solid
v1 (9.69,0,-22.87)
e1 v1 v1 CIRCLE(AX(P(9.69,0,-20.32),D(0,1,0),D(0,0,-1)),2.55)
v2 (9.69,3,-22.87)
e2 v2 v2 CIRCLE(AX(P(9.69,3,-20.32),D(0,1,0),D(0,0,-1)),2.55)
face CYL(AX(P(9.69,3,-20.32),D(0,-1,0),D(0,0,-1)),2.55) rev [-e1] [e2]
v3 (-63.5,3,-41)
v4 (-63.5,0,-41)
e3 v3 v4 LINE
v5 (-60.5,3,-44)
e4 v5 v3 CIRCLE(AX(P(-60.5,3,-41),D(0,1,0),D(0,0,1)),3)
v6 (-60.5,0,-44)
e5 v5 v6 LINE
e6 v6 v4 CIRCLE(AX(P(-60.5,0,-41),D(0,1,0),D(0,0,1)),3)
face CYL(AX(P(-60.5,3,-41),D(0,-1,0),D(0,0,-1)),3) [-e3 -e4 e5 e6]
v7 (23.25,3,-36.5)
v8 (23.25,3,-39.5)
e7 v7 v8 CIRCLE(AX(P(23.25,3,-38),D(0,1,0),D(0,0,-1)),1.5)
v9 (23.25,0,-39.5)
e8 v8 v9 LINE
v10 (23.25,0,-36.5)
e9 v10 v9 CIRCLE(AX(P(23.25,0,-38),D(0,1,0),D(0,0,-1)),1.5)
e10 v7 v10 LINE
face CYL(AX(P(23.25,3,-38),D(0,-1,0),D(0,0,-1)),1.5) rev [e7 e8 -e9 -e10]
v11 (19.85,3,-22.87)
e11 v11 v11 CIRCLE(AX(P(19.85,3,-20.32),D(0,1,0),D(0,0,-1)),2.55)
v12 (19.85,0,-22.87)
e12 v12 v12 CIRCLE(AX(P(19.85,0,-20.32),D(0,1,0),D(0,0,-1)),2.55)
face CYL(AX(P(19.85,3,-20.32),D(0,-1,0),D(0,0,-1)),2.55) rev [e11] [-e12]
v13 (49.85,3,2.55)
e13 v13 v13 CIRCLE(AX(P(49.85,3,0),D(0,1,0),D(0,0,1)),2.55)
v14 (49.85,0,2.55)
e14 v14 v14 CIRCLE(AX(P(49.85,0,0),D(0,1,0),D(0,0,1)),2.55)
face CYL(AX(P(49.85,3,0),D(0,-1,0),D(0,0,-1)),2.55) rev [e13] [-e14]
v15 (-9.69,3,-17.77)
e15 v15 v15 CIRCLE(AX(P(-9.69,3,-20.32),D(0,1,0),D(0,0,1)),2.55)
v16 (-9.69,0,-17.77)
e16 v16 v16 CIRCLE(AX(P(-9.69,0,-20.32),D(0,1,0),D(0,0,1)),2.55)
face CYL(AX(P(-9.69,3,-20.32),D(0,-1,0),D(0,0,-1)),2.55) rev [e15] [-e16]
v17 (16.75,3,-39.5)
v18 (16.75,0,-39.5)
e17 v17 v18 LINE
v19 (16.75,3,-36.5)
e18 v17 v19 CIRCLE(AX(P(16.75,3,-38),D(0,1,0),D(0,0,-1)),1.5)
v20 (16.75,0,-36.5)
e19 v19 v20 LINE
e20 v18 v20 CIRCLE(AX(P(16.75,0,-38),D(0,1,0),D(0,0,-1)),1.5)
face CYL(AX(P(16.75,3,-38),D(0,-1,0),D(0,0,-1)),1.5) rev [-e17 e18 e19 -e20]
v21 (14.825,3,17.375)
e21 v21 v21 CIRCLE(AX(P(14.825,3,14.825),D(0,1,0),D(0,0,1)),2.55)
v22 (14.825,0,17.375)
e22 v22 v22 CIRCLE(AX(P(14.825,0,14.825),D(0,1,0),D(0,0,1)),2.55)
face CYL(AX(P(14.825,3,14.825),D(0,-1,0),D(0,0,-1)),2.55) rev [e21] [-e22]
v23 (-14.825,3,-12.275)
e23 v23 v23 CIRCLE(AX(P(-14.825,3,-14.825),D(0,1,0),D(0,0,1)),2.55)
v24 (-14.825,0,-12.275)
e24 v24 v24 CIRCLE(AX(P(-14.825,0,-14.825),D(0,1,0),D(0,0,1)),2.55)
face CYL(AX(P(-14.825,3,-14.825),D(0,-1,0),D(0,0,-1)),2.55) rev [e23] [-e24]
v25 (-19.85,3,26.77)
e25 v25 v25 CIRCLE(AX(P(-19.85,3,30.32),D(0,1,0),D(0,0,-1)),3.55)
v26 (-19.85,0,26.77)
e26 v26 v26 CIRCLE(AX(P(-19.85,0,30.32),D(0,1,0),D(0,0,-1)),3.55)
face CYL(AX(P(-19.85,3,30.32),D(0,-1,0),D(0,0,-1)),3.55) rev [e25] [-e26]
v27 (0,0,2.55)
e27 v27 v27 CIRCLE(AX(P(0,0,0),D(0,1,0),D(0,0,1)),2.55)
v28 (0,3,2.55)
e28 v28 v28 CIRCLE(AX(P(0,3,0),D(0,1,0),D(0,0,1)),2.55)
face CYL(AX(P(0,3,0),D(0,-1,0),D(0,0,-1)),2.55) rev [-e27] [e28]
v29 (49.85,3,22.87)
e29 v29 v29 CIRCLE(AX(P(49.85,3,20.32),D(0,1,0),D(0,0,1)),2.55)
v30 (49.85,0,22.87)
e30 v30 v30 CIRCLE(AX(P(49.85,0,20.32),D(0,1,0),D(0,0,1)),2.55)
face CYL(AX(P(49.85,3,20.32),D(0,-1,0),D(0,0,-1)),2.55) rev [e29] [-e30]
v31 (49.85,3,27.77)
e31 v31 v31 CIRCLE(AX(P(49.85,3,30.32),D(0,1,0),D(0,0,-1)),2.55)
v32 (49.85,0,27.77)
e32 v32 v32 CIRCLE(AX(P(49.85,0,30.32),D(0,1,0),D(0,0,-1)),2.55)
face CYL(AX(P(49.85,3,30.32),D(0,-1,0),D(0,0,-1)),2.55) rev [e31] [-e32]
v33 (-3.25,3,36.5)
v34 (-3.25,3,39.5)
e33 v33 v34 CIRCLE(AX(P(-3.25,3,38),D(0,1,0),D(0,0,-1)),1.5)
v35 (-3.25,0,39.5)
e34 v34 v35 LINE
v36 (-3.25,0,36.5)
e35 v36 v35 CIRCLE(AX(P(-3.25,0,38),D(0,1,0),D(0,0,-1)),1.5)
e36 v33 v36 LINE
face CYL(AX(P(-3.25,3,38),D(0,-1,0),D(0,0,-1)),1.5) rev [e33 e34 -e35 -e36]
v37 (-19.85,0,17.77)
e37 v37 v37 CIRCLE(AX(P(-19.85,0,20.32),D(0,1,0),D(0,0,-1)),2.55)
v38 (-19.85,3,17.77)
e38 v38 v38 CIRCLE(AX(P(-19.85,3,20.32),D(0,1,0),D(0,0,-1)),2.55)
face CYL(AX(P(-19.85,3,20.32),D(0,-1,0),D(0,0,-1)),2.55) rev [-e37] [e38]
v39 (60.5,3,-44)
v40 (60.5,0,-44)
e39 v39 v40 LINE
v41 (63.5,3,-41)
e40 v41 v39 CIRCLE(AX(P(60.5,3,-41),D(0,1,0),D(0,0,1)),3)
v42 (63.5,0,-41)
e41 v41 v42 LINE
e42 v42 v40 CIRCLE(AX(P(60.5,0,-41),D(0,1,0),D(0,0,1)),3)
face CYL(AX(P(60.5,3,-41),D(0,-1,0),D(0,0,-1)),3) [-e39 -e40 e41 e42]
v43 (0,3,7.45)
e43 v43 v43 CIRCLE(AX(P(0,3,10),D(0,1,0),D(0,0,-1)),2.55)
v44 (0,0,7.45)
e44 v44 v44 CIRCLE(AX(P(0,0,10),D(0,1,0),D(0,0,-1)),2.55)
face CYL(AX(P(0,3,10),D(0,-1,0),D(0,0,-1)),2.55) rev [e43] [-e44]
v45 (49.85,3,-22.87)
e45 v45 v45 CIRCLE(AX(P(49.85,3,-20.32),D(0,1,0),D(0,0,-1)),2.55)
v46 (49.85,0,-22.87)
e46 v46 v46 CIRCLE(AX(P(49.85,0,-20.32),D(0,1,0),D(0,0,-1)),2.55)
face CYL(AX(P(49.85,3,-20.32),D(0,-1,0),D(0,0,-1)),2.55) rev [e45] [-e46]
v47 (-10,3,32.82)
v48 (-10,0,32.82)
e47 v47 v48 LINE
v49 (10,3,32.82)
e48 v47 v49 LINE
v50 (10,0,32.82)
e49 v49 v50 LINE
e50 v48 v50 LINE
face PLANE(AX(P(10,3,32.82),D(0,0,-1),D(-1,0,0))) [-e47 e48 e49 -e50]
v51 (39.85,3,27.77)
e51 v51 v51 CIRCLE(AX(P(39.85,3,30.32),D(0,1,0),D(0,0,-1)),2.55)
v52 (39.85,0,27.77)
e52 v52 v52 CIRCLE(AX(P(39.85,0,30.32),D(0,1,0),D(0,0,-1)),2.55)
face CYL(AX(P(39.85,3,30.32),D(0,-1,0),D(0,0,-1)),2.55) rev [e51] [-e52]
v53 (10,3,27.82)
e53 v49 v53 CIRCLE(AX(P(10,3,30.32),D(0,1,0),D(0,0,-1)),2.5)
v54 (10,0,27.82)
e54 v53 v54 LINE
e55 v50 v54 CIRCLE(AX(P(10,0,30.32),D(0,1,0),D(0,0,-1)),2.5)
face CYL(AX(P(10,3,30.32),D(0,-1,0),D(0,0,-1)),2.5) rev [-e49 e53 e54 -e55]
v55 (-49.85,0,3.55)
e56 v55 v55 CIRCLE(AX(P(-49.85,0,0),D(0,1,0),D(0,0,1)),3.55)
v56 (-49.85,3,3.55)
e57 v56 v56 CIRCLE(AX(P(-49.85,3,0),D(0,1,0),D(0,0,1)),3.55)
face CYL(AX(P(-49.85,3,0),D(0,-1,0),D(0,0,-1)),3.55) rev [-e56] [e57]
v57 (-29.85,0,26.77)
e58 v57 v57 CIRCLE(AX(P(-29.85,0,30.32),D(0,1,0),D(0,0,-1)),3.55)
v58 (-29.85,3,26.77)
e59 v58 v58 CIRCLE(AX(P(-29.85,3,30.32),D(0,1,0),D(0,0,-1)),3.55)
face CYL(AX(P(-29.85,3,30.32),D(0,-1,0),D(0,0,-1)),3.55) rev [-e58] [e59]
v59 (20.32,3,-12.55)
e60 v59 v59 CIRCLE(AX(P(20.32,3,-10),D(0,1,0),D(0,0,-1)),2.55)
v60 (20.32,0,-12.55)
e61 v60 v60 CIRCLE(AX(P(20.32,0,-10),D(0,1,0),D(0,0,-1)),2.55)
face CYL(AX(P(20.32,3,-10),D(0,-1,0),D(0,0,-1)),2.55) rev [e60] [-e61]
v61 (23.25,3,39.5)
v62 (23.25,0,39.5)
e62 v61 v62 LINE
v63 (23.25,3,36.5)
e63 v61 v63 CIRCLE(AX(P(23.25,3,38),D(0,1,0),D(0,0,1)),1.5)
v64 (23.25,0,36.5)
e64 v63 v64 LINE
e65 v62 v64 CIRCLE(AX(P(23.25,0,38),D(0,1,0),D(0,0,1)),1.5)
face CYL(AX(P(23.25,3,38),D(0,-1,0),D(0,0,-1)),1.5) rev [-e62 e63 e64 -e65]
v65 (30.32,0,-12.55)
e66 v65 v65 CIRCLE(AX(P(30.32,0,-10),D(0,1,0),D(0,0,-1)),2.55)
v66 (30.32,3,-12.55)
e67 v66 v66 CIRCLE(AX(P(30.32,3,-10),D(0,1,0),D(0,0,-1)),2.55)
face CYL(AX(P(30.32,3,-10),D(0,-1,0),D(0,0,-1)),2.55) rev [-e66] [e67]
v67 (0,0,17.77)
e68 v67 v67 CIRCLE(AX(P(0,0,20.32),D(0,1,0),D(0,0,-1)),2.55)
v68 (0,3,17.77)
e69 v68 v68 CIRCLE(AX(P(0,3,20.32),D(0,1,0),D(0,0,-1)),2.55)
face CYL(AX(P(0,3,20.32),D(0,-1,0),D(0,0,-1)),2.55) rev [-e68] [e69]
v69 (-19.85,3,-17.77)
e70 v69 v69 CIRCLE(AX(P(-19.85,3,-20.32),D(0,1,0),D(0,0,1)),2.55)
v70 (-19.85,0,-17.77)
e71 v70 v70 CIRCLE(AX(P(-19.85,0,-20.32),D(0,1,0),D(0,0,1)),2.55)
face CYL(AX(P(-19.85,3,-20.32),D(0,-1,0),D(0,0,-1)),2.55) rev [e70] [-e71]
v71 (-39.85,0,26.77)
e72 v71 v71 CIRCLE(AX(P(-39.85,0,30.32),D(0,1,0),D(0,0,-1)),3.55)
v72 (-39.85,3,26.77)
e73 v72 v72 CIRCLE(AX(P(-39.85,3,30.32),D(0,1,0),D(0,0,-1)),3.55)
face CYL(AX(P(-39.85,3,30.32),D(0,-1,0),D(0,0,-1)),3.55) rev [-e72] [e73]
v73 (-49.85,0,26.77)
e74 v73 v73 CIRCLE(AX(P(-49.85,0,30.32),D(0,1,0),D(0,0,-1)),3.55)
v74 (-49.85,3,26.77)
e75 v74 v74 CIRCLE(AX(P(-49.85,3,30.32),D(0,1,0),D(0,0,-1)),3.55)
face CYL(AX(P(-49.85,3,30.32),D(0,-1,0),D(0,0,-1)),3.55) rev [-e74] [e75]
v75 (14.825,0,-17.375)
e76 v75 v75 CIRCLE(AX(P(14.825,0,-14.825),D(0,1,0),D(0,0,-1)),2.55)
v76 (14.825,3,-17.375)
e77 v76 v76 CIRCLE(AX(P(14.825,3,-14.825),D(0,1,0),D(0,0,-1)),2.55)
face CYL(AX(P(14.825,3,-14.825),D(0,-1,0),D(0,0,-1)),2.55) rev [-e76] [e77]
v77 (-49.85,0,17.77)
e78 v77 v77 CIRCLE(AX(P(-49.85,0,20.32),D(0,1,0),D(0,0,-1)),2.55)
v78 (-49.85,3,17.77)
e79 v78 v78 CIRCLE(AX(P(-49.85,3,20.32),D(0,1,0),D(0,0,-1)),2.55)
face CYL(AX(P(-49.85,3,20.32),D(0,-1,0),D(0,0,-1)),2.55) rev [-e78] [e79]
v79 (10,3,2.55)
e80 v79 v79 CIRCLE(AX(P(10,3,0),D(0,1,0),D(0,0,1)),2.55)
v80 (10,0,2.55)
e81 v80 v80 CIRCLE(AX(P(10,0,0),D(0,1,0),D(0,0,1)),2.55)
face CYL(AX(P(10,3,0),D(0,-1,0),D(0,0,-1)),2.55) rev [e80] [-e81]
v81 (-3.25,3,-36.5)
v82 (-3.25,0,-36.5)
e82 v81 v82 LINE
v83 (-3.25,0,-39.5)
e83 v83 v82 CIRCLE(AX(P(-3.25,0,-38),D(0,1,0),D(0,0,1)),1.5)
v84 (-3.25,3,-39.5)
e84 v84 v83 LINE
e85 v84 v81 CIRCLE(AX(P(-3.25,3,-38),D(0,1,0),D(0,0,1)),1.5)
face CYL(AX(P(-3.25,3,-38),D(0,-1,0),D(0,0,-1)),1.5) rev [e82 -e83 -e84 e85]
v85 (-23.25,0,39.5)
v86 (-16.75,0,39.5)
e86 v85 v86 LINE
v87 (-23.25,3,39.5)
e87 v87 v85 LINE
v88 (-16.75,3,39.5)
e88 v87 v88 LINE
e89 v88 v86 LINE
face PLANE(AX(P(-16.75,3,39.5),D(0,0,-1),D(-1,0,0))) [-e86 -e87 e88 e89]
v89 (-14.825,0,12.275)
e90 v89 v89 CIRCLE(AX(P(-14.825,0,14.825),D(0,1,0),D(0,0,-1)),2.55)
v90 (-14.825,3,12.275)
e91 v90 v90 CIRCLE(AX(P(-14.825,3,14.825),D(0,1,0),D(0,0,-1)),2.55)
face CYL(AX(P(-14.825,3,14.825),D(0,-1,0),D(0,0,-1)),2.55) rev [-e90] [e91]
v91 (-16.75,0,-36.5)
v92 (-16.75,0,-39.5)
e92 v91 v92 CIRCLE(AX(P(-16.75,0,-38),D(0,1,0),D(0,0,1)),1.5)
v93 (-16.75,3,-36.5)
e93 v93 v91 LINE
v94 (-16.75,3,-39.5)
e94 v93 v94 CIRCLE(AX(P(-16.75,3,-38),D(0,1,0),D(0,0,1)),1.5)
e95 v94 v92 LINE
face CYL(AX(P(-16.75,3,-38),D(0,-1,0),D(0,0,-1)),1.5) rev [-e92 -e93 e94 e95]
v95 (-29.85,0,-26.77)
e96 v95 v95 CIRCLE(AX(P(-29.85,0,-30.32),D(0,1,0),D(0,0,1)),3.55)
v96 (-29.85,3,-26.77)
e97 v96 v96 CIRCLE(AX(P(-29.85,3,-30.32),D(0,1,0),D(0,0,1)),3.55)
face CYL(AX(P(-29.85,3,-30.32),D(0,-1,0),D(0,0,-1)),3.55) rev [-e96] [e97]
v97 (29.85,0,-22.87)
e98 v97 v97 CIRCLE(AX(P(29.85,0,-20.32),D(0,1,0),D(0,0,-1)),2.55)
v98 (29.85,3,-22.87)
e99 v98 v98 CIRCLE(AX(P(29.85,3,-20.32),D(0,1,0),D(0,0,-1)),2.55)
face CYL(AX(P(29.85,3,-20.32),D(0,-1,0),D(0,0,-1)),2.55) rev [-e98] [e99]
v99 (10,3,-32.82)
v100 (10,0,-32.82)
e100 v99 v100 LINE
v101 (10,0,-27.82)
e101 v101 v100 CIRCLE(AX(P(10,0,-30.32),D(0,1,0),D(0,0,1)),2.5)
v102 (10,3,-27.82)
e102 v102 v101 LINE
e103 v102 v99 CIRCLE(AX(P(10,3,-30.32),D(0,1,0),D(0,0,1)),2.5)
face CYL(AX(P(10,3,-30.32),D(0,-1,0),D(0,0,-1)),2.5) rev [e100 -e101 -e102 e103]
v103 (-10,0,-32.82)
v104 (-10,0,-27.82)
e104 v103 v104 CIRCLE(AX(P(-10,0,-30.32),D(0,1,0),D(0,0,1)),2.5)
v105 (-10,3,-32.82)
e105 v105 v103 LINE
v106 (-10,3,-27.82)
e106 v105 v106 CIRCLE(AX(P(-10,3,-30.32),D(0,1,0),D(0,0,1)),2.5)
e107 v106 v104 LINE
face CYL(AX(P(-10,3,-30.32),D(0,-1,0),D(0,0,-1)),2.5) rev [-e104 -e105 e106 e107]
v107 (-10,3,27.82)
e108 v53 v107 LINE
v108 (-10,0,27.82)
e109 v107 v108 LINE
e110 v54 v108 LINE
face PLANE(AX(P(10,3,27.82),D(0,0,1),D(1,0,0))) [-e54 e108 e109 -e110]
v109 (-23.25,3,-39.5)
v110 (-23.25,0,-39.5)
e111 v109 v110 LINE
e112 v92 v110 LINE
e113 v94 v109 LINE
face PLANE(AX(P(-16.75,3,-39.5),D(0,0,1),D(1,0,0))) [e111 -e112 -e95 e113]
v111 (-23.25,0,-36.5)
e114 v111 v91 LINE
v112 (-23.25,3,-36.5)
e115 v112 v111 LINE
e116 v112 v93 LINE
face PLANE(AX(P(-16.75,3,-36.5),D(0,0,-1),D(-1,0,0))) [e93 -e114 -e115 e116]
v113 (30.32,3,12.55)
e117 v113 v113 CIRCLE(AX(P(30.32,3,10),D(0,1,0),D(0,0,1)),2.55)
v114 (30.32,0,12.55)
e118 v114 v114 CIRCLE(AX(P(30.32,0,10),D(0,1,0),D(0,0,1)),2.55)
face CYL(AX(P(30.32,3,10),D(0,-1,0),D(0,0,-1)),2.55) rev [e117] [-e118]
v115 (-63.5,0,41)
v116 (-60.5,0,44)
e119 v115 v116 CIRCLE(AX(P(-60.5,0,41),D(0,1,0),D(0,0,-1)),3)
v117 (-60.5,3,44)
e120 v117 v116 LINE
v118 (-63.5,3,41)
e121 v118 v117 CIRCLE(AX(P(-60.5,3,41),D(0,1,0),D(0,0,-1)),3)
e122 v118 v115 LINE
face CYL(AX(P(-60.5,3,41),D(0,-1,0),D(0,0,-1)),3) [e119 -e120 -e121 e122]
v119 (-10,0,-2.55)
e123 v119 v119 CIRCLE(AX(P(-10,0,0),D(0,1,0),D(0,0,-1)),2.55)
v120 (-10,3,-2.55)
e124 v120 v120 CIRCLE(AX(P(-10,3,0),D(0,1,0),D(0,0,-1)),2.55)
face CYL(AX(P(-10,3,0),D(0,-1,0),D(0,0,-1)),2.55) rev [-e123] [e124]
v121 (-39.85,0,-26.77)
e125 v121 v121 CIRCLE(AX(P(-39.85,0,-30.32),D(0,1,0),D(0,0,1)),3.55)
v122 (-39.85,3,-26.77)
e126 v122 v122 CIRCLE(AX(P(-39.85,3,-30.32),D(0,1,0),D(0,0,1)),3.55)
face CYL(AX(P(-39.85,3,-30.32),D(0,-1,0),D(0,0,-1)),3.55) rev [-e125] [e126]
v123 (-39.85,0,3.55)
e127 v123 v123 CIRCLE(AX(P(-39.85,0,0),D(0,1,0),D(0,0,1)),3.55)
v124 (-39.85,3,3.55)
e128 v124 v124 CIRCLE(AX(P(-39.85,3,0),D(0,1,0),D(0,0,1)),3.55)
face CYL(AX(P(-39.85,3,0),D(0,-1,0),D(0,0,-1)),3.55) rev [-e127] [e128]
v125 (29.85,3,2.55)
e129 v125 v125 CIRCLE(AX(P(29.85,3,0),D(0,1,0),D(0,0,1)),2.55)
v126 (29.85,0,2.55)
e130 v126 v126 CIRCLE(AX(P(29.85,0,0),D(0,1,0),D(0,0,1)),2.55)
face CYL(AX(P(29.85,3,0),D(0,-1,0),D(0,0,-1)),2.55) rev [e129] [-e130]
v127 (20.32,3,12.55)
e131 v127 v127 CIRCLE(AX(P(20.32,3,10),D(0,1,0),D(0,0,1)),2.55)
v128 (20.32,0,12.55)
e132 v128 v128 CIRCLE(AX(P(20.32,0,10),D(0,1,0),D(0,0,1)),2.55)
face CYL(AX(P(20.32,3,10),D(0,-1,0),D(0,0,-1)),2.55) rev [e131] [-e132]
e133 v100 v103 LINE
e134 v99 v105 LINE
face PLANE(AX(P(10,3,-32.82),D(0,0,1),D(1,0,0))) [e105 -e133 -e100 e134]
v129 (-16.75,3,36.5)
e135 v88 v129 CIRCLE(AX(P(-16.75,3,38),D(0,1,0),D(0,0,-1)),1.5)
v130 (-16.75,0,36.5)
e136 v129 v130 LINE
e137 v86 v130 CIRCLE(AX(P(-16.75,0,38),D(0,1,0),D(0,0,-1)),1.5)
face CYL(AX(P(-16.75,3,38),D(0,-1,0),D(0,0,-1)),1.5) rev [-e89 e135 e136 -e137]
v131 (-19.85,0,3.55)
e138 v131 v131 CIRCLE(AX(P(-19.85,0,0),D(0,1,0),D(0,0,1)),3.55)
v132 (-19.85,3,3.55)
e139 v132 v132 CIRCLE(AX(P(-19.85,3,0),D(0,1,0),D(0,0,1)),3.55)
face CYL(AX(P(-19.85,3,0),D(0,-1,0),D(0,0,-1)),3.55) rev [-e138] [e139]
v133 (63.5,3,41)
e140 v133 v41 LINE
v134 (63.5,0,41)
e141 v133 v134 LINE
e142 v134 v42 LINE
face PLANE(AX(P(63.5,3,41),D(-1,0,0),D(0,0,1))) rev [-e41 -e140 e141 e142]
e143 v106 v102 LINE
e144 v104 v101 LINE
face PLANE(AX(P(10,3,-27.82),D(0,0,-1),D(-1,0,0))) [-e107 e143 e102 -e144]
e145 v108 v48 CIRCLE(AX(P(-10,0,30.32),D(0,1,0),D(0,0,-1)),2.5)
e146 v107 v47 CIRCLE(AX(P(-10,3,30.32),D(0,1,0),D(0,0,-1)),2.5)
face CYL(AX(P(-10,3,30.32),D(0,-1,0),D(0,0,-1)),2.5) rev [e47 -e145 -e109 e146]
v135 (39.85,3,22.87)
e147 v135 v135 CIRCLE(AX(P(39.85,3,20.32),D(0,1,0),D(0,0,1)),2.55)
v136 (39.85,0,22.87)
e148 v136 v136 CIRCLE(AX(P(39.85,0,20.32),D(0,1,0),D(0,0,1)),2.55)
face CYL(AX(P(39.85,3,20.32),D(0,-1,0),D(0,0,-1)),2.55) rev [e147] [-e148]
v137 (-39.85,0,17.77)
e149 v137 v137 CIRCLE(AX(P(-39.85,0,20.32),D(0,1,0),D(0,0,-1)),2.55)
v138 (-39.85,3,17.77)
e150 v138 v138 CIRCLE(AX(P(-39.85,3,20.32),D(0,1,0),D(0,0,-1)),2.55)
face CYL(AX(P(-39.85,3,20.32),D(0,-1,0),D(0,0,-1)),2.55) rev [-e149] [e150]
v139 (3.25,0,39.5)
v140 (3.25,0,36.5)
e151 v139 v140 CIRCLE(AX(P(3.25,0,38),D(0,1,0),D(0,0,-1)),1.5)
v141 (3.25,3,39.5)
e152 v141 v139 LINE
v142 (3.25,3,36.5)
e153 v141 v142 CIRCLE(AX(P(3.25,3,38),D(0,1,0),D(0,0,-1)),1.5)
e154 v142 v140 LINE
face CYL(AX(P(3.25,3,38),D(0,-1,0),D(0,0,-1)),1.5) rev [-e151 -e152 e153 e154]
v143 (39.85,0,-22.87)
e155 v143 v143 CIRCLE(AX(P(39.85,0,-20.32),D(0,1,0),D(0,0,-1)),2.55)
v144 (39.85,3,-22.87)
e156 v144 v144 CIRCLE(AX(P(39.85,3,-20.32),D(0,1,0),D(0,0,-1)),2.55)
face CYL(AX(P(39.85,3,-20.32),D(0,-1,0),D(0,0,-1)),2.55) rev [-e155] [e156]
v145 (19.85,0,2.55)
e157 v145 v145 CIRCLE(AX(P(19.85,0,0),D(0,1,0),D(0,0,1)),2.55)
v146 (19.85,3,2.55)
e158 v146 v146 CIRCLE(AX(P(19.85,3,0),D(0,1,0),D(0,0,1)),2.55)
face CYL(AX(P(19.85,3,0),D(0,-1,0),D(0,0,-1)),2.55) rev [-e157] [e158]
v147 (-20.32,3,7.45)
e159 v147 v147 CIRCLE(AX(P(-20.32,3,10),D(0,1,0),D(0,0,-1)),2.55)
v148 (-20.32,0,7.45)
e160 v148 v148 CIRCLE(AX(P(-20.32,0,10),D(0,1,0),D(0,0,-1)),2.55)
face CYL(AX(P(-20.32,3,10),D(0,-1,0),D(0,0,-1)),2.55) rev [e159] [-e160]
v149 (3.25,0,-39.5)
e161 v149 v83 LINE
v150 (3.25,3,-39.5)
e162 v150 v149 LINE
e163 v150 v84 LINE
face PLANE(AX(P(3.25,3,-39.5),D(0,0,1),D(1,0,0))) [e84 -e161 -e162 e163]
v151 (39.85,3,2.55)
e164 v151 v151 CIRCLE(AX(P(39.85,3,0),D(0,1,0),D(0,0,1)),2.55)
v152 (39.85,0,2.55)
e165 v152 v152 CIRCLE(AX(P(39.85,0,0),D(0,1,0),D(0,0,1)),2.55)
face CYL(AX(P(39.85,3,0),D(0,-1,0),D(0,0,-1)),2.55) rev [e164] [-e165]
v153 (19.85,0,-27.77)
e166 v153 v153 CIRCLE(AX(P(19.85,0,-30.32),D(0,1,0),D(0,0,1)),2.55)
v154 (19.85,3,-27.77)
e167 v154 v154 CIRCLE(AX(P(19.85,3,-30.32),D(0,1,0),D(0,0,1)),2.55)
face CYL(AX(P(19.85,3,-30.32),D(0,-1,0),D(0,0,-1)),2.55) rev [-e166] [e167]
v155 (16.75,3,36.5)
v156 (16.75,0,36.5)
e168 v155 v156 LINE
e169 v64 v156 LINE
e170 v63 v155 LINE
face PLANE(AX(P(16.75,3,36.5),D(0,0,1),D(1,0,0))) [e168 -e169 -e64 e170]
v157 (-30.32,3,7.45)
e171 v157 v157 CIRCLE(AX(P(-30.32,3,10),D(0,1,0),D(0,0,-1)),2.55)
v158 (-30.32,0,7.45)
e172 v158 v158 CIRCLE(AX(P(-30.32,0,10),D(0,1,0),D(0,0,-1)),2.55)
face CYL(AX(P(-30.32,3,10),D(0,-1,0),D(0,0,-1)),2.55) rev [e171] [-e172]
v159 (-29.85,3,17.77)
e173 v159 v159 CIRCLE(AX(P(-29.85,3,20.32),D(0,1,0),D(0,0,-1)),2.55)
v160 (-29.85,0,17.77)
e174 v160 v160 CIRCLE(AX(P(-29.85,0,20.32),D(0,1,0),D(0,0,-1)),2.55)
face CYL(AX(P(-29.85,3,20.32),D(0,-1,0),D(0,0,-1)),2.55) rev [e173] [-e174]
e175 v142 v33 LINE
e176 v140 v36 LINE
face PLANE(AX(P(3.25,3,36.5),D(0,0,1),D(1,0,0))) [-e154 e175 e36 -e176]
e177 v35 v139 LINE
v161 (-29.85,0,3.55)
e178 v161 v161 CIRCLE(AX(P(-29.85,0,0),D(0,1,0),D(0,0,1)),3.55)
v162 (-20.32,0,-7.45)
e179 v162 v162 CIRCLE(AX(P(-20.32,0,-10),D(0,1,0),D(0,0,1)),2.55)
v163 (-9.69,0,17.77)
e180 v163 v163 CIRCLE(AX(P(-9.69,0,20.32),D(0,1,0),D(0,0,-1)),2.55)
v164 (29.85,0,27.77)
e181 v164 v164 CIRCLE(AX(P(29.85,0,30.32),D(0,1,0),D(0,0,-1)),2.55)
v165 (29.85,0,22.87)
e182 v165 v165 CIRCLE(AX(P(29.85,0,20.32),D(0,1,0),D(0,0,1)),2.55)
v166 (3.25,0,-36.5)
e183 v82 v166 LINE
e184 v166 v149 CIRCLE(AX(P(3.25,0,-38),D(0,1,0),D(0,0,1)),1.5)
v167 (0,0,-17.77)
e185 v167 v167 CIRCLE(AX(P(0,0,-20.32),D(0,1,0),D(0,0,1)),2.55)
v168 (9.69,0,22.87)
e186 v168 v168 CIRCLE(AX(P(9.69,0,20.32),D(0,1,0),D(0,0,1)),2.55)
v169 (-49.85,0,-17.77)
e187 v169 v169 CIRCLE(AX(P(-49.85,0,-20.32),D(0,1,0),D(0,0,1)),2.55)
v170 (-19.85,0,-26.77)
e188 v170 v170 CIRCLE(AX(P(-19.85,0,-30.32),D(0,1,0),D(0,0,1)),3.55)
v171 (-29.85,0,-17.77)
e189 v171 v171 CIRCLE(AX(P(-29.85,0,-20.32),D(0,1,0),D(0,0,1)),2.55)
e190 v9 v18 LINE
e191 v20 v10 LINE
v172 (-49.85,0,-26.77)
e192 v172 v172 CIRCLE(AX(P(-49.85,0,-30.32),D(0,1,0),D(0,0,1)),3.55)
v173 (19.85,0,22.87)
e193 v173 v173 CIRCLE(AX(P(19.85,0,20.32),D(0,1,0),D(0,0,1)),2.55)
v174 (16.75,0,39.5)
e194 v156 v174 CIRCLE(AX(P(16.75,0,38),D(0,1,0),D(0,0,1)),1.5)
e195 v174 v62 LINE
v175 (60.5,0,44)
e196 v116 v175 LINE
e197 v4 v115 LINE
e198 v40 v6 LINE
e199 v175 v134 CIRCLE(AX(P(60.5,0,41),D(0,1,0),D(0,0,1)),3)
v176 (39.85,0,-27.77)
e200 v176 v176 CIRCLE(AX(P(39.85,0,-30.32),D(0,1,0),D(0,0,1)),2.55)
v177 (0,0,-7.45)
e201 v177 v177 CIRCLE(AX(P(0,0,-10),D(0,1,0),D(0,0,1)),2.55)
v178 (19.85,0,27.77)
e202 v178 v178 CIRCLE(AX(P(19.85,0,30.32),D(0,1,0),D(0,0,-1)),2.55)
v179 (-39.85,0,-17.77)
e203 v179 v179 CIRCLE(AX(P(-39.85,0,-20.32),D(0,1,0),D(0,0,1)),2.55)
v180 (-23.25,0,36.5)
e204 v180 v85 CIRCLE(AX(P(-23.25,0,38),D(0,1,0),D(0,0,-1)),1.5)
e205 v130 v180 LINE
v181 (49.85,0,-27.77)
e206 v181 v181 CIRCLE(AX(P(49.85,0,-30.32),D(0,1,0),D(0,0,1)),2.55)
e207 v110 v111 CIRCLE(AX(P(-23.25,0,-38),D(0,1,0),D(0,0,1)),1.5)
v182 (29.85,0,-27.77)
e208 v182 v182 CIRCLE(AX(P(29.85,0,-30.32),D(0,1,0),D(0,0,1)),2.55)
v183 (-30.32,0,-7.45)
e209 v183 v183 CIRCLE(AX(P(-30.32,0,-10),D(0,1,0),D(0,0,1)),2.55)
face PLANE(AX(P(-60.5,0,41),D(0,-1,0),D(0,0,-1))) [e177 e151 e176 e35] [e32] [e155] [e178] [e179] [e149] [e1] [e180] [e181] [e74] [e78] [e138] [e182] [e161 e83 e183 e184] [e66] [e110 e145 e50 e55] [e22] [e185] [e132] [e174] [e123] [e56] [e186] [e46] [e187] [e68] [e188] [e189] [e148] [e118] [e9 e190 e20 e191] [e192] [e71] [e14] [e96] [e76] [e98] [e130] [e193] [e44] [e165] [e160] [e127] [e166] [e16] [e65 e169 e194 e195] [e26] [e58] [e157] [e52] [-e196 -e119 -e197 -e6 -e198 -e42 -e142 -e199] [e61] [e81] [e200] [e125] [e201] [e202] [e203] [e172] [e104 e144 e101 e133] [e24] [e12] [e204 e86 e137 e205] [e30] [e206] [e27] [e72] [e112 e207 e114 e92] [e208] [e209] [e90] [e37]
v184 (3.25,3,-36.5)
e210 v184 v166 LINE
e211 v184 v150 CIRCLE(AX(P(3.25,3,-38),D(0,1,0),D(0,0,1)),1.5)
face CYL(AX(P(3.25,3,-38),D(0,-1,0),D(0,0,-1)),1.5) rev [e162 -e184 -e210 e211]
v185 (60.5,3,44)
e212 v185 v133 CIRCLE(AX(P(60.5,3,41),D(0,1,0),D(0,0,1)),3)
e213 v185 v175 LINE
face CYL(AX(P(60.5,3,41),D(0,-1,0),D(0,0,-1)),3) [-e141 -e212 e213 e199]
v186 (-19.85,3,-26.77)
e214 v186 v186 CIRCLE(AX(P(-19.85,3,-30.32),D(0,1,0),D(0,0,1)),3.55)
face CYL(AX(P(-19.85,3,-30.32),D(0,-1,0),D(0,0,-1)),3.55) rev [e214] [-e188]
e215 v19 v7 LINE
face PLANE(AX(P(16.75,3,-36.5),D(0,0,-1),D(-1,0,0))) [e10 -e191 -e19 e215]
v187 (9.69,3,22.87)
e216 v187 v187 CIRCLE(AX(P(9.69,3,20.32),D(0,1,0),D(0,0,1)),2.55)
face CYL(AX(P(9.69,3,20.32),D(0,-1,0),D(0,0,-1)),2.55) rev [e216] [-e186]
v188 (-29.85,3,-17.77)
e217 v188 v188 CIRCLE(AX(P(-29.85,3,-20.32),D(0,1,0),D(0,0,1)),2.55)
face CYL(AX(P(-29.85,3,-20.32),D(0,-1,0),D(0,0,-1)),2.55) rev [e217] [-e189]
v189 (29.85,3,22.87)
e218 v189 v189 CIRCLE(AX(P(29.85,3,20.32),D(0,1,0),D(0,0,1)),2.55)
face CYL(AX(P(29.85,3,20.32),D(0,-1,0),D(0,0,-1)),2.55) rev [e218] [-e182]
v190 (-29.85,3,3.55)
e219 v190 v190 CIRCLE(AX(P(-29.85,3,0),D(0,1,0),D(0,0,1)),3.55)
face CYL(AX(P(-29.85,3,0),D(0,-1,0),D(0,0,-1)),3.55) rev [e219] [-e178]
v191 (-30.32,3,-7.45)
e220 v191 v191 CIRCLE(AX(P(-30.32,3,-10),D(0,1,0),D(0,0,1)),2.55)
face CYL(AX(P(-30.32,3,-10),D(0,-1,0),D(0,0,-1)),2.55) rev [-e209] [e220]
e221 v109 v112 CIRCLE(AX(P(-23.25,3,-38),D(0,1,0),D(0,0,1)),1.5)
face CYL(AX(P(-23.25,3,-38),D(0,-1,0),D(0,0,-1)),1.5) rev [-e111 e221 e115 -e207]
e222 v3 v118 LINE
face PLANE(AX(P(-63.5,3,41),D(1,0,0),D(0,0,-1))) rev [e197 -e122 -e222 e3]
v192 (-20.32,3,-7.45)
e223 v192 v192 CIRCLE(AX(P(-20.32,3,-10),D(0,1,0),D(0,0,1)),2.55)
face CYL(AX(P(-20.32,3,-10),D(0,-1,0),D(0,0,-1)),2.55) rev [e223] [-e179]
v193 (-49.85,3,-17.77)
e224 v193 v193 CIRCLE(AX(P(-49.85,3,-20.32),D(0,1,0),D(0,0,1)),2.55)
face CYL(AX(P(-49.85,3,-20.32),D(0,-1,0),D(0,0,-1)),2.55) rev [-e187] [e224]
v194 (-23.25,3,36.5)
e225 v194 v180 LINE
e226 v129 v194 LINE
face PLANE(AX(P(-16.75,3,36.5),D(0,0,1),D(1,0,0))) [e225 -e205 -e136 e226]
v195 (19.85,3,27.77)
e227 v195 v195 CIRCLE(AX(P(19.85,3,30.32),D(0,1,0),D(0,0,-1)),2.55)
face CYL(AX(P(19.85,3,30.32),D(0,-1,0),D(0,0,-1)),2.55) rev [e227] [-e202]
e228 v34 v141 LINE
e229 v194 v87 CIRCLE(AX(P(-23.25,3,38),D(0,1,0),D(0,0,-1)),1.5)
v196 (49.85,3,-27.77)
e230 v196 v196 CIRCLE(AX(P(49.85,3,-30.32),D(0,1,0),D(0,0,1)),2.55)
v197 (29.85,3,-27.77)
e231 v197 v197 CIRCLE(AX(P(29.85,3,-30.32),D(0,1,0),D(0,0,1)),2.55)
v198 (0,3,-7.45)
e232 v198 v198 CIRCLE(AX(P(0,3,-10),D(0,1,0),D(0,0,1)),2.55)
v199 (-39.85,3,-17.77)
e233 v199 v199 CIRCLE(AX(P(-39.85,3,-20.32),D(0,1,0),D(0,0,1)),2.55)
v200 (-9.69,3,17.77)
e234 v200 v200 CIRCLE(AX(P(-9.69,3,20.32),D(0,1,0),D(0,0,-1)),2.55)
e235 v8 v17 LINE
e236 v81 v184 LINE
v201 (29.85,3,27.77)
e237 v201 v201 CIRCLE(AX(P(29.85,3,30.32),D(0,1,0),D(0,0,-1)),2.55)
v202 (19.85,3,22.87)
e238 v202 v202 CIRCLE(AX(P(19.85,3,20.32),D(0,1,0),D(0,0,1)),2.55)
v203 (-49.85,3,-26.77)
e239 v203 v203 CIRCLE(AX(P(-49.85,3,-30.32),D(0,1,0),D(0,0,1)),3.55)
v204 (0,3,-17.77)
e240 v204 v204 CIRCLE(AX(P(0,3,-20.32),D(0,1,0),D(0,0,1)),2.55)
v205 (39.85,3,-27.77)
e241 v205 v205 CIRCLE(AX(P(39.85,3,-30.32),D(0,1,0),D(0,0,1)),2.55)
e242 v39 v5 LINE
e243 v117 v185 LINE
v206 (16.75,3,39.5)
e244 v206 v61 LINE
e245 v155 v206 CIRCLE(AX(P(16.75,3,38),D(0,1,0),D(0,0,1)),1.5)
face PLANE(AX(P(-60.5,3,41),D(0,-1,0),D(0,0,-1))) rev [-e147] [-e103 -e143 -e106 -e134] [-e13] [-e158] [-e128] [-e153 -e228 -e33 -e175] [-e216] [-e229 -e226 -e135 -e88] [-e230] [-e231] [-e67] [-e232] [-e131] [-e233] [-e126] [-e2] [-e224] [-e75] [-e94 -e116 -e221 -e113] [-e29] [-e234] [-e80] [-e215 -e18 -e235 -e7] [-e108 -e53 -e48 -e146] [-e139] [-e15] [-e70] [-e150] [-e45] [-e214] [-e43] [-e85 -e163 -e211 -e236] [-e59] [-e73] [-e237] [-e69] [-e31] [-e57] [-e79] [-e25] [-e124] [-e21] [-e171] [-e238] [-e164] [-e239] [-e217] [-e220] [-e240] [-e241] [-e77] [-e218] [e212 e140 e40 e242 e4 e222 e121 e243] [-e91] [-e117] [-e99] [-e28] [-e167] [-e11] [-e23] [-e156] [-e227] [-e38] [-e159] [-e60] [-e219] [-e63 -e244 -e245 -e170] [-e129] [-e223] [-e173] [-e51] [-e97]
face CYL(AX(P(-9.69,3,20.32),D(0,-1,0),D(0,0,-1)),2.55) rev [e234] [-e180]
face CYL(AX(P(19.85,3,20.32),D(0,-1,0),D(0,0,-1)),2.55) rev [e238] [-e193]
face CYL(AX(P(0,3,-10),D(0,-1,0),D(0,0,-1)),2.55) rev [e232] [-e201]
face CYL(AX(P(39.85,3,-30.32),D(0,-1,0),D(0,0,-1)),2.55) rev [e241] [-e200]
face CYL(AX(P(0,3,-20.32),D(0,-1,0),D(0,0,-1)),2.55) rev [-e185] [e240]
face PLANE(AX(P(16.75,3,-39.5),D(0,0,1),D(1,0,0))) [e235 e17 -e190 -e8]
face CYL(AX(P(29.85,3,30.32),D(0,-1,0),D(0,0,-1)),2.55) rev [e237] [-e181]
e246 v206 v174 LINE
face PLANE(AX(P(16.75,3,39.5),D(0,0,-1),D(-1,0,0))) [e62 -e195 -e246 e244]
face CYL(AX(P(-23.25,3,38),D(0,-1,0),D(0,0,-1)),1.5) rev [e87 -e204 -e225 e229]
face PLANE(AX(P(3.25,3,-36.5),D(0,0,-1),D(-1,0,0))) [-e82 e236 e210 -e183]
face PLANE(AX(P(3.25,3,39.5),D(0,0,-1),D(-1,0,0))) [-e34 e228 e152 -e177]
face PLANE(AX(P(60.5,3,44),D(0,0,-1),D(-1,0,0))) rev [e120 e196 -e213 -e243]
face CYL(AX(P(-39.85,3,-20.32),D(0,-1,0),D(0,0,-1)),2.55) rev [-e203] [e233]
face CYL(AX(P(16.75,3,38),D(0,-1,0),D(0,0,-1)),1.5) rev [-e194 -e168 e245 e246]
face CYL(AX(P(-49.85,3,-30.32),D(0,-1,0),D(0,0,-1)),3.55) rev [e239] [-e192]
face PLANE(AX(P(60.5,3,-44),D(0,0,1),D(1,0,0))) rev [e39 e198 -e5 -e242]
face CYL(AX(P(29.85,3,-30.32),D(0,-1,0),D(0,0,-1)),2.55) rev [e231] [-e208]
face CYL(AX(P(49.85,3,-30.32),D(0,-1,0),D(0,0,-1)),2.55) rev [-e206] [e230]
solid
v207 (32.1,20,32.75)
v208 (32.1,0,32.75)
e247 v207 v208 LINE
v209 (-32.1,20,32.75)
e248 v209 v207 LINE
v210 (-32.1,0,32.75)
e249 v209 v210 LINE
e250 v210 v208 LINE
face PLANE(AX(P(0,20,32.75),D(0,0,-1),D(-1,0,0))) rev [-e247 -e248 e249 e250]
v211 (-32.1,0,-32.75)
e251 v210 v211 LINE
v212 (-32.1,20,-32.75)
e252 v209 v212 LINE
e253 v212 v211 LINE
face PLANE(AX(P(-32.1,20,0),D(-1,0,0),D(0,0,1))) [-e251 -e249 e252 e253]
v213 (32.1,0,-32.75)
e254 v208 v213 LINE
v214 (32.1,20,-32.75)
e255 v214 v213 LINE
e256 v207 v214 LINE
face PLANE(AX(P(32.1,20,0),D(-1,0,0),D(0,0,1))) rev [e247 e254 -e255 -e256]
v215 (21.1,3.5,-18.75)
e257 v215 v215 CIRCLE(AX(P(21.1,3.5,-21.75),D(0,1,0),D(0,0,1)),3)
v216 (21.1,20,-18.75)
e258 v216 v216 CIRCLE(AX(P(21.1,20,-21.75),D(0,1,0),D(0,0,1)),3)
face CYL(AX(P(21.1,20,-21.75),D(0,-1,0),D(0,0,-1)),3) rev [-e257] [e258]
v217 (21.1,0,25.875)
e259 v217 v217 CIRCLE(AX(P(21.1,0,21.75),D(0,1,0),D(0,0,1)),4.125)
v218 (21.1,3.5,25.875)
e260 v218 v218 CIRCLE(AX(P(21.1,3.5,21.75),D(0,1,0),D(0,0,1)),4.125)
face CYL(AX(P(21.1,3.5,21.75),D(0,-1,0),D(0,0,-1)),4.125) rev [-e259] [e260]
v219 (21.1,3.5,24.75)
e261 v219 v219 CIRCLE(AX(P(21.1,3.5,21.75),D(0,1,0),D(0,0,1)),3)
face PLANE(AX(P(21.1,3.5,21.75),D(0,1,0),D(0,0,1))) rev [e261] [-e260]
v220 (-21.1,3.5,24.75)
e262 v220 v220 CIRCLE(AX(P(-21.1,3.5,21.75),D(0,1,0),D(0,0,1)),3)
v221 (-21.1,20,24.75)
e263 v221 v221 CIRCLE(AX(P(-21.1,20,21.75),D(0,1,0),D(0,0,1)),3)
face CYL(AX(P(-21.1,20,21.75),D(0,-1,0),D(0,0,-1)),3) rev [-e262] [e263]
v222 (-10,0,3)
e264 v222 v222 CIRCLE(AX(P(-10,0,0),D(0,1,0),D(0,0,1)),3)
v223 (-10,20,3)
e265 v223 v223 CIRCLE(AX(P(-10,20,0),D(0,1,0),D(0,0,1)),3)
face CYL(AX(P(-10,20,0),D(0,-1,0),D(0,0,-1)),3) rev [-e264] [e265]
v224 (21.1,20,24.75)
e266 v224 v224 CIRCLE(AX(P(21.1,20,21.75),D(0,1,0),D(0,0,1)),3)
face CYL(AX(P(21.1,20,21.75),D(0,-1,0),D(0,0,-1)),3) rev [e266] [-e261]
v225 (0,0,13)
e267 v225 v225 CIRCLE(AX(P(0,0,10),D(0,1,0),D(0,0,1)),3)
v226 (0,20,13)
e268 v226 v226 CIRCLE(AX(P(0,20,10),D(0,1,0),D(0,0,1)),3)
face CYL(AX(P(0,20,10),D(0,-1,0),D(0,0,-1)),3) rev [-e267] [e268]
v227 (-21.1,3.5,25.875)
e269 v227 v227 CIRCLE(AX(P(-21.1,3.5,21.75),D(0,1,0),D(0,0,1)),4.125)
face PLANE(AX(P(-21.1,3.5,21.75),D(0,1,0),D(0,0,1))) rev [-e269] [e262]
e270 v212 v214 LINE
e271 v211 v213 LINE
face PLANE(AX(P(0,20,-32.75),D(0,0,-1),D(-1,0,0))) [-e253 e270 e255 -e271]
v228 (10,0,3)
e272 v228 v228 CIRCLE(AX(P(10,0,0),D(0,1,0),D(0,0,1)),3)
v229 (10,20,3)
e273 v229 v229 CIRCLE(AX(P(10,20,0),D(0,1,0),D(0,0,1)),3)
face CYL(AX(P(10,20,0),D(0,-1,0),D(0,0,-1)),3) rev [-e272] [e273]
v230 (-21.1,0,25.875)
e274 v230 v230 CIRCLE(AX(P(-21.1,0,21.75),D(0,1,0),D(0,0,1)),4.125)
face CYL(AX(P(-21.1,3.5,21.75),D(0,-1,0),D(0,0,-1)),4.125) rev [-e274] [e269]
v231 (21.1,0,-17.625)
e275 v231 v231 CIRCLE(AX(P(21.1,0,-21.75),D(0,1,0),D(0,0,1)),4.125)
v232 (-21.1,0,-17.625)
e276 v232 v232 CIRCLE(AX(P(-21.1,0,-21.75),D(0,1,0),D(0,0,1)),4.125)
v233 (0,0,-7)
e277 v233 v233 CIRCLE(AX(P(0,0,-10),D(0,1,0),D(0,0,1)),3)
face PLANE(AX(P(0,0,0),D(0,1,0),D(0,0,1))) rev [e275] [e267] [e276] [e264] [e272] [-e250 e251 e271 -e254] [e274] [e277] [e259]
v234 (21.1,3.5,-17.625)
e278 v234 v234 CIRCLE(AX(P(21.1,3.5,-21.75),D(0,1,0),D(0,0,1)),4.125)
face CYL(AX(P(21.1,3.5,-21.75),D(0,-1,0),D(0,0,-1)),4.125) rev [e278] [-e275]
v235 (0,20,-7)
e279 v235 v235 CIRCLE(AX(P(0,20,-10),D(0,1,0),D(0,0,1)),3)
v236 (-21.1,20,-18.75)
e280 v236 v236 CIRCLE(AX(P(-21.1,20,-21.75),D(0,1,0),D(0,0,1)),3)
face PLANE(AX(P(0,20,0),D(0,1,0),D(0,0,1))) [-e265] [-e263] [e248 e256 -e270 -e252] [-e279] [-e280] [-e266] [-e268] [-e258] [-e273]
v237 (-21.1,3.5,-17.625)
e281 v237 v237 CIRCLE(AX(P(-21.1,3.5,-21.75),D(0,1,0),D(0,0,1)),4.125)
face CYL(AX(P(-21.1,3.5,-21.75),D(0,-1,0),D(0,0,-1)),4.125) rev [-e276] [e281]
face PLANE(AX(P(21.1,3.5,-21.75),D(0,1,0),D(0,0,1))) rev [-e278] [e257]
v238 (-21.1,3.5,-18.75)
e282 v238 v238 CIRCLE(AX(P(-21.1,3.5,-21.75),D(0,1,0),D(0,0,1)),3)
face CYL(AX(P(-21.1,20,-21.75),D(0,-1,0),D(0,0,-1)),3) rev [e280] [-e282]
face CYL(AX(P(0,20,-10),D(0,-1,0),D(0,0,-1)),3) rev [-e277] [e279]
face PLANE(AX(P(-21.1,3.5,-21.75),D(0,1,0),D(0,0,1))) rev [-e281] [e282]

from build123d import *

# Parameters (mm, degrees)
V_SLOT_GANTRY_PLATE_20_80MM_OUTLINE_R   = 3.55
V_SLOT_GANTRY_PLATE_20_80MM_OUTLINE_R_2 = 2.55
V_SLOT_GANTRY_PLATE_20_80MM_DEPTH       = 3
SKETCH1_W                               = 64.2
SKETCH1_H                               = 65.5
SKETCH1_R                               = 4.125
SKETCH1_R_2                             = 3
BOSS_EXTRUDE1_DEPTH                     = 20
SKETCH1_3_R                             = 4.125
CUT_EXTRUDE1_DEPTH                      = 3.5


# Read off the part's stored shape, not the designer's step: V-Slot Gantry Plate 20-80mm
with BuildPart() as part:
    # V-Slot Gantry Plate 20-80mm outline → V-Slot Gantry Plate 20-80mm (new body)
    with BuildSketch(Plane(origin=(0, 0, 0), x_dir=(1, 0, 0), z_dir=(0, 1, 0))):
        with BuildLine():
            ThreePointArc((-63.5, -41), (-62.621320344, -43.121320344), (-60.5, -44))
            Line((-60.5, -44), (60.5, -44))
            ThreePointArc((60.5, -44), (62.621320344, -43.121320344), (63.5, -41))
            Line((63.5, -41), (63.5, 41))
            ThreePointArc((63.5, 41), (62.621320344, 43.121320344), (60.5, 44))
            Line((60.5, 44), (-60.5, 44))
            ThreePointArc((-60.5, 44), (-62.621320344, 43.121320344), (-63.5, 41))
            Line((-63.5, 41), (-63.5, -41))
        make_face()
        with Locations((-49.85, -30.32)):
            Circle(V_SLOT_GANTRY_PLATE_20_80MM_OUTLINE_R, mode=Mode.SUBTRACT)
        with Locations((-39.85, -30.32)):
            Circle(V_SLOT_GANTRY_PLATE_20_80MM_OUTLINE_R, mode=Mode.SUBTRACT)
        with BuildLine():
            Line((-23.25, -36.5), (-16.75, -36.5))
            ThreePointArc((-16.75, -36.5), (-15.25, -38), (-16.75, -39.5))
            Line((-16.75, -39.5), (-23.25, -39.5))
            ThreePointArc((-23.25, -39.5), (-24.75, -38), (-23.25, -36.5))
        make_face(mode=Mode.SUBTRACT)
        with Locations((-29.85, -30.32)):
            Circle(V_SLOT_GANTRY_PLATE_20_80MM_OUTLINE_R, mode=Mode.SUBTRACT)
        with Locations((-19.85, -30.32)):
            Circle(V_SLOT_GANTRY_PLATE_20_80MM_OUTLINE_R, mode=Mode.SUBTRACT)
        with Locations((-49.85, -20.32)):
            Circle(V_SLOT_GANTRY_PLATE_20_80MM_OUTLINE_R_2, mode=Mode.SUBTRACT)
        with Locations((-39.85, -20.32)):
            Circle(V_SLOT_GANTRY_PLATE_20_80MM_OUTLINE_R_2, mode=Mode.SUBTRACT)
        with Locations((-29.85, -20.32)):
            Circle(V_SLOT_GANTRY_PLATE_20_80MM_OUTLINE_R_2, mode=Mode.SUBTRACT)
        with Locations((-19.85, -20.32)):
            Circle(V_SLOT_GANTRY_PLATE_20_80MM_OUTLINE_R_2, mode=Mode.SUBTRACT)
        with Locations((-9.69, -20.32)):
            Circle(V_SLOT_GANTRY_PLATE_20_80MM_OUTLINE_R_2, mode=Mode.SUBTRACT)
        with Locations((-14.825, -14.825)):
            Circle(V_SLOT_GANTRY_PLATE_20_80MM_OUTLINE_R_2, mode=Mode.SUBTRACT)
        with Locations((-30.32, -10)):
            Circle(V_SLOT_GANTRY_PLATE_20_80MM_OUTLINE_R_2, mode=Mode.SUBTRACT)
        with Locations((-20.32, -10)):
            Circle(V_SLOT_GANTRY_PLATE_20_80MM_OUTLINE_R_2, mode=Mode.SUBTRACT)
        with BuildLine():
            Line((-3.25, -36.5), (3.25, -36.5))
            ThreePointArc((3.25, -36.5), (4.75, -38), (3.25, -39.5))
            Line((3.25, -39.5), (-3.25, -39.5))
            ThreePointArc((-3.25, -39.5), (-4.75, -38), (-3.25, -36.5))
        make_face(mode=Mode.SUBTRACT)
        with BuildLine():
            Line((23.25, -39.5), (16.75, -39.5))
            ThreePointArc((16.75, -39.5), (15.25, -38), (16.75, -36.5))
            Line((16.75, -36.5), (23.25, -36.5))
            ThreePointArc((23.25, -36.5), (24.75, -38), (23.25, -39.5))
        make_face(mode=Mode.SUBTRACT)
        with BuildLine():
            Line((-10, -27.82), (10, -27.82))
            ThreePointArc((10, -27.82), (12.5, -30.32), (10, -32.82))
            Line((10, -32.82), (-10, -32.82))
            ThreePointArc((-10, -32.82), (-12.5, -30.32), (-10, -27.82))
        make_face(mode=Mode.SUBTRACT)
        with Locations((19.85, -30.32)):
            Circle(V_SLOT_GANTRY_PLATE_20_80MM_OUTLINE_R_2, mode=Mode.SUBTRACT)
        with Locations((29.85, -30.32)):
            Circle(V_SLOT_GANTRY_PLATE_20_80MM_OUTLINE_R_2, mode=Mode.SUBTRACT)
        with Locations((39.85, -30.32)):
            Circle(V_SLOT_GANTRY_PLATE_20_80MM_OUTLINE_R_2, mode=Mode.SUBTRACT)
        with Locations((49.85, -30.32)):
            Circle(V_SLOT_GANTRY_PLATE_20_80MM_OUTLINE_R_2, mode=Mode.SUBTRACT)
        with Locations((0, -20.32)):
            Circle(V_SLOT_GANTRY_PLATE_20_80MM_OUTLINE_R_2, mode=Mode.SUBTRACT)
        with Locations((9.69, -20.32)):
            Circle(V_SLOT_GANTRY_PLATE_20_80MM_OUTLINE_R_2, mode=Mode.SUBTRACT)
        with Locations((14.825, -14.825)):
            Circle(V_SLOT_GANTRY_PLATE_20_80MM_OUTLINE_R_2, mode=Mode.SUBTRACT)
        with Locations((19.85, -20.32)):
            Circle(V_SLOT_GANTRY_PLATE_20_80MM_OUTLINE_R_2, mode=Mode.SUBTRACT)
        with Locations((29.85, -20.32)):
            Circle(V_SLOT_GANTRY_PLATE_20_80MM_OUTLINE_R_2, mode=Mode.SUBTRACT)
        with Locations((0, -10)):
            Circle(V_SLOT_GANTRY_PLATE_20_80MM_OUTLINE_R_2, mode=Mode.SUBTRACT)
        with Locations((20.32, -10)):
            Circle(V_SLOT_GANTRY_PLATE_20_80MM_OUTLINE_R_2, mode=Mode.SUBTRACT)
        with Locations((30.32, -10)):
            Circle(V_SLOT_GANTRY_PLATE_20_80MM_OUTLINE_R_2, mode=Mode.SUBTRACT)
        with Locations((39.85, -20.32)):
            Circle(V_SLOT_GANTRY_PLATE_20_80MM_OUTLINE_R_2, mode=Mode.SUBTRACT)
        with Locations((49.85, -20.32)):
            Circle(V_SLOT_GANTRY_PLATE_20_80MM_OUTLINE_R_2, mode=Mode.SUBTRACT)
        with Locations((-49.85, 0)):
            Circle(V_SLOT_GANTRY_PLATE_20_80MM_OUTLINE_R, mode=Mode.SUBTRACT)
        with Locations((-39.85, 0)):
            Circle(V_SLOT_GANTRY_PLATE_20_80MM_OUTLINE_R, mode=Mode.SUBTRACT)
        with Locations((-49.85, 20.32)):
            Circle(V_SLOT_GANTRY_PLATE_20_80MM_OUTLINE_R_2, mode=Mode.SUBTRACT)
        with Locations((-39.85, 20.32)):
            Circle(V_SLOT_GANTRY_PLATE_20_80MM_OUTLINE_R_2, mode=Mode.SUBTRACT)
        with Locations((-29.85, 0)):
            Circle(V_SLOT_GANTRY_PLATE_20_80MM_OUTLINE_R, mode=Mode.SUBTRACT)
        with Locations((-19.85, 0)):
            Circle(V_SLOT_GANTRY_PLATE_20_80MM_OUTLINE_R, mode=Mode.SUBTRACT)
        with Locations((-30.32, 10)):
            Circle(V_SLOT_GANTRY_PLATE_20_80MM_OUTLINE_R_2, mode=Mode.SUBTRACT)
        with Locations((-20.32, 10)):
            Circle(V_SLOT_GANTRY_PLATE_20_80MM_OUTLINE_R_2, mode=Mode.SUBTRACT)
        with Locations((-10, 0)):
            Circle(V_SLOT_GANTRY_PLATE_20_80MM_OUTLINE_R_2, mode=Mode.SUBTRACT)
        with Locations((-29.85, 20.32)):
            Circle(V_SLOT_GANTRY_PLATE_20_80MM_OUTLINE_R_2, mode=Mode.SUBTRACT)
        with Locations((-19.85, 20.32)):
            Circle(V_SLOT_GANTRY_PLATE_20_80MM_OUTLINE_R_2, mode=Mode.SUBTRACT)
        with Locations((-14.825, 14.825)):
            Circle(V_SLOT_GANTRY_PLATE_20_80MM_OUTLINE_R_2, mode=Mode.SUBTRACT)
        with Locations((-9.69, 20.32)):
            Circle(V_SLOT_GANTRY_PLATE_20_80MM_OUTLINE_R_2, mode=Mode.SUBTRACT)
        with Locations((-49.85, 30.32)):
            Circle(V_SLOT_GANTRY_PLATE_20_80MM_OUTLINE_R, mode=Mode.SUBTRACT)
        with Locations((-39.85, 30.32)):
            Circle(V_SLOT_GANTRY_PLATE_20_80MM_OUTLINE_R, mode=Mode.SUBTRACT)
        with Locations((-29.85, 30.32)):
            Circle(V_SLOT_GANTRY_PLATE_20_80MM_OUTLINE_R, mode=Mode.SUBTRACT)
        with Locations((-19.85, 30.32)):
            Circle(V_SLOT_GANTRY_PLATE_20_80MM_OUTLINE_R, mode=Mode.SUBTRACT)
        with BuildLine():
            Line((-23.25, 39.5), (-16.75, 39.5))
            ThreePointArc((-16.75, 39.5), (-15.25, 38), (-16.75, 36.5))
            Line((-16.75, 36.5), (-23.25, 36.5))
            ThreePointArc((-23.25, 36.5), (-24.75, 38), (-23.25, 39.5))
        make_face(mode=Mode.SUBTRACT)
        Circle(V_SLOT_GANTRY_PLATE_20_80MM_OUTLINE_R_2, mode=Mode.SUBTRACT)
        with Locations((10, 0)):
            Circle(V_SLOT_GANTRY_PLATE_20_80MM_OUTLINE_R_2, mode=Mode.SUBTRACT)
        with Locations((0, 10)):
            Circle(V_SLOT_GANTRY_PLATE_20_80MM_OUTLINE_R_2, mode=Mode.SUBTRACT)
        with Locations((19.85, 0)):
            Circle(V_SLOT_GANTRY_PLATE_20_80MM_OUTLINE_R_2, mode=Mode.SUBTRACT)
        with Locations((29.85, 0)):
            Circle(V_SLOT_GANTRY_PLATE_20_80MM_OUTLINE_R_2, mode=Mode.SUBTRACT)
        with Locations((20.32, 10)):
            Circle(V_SLOT_GANTRY_PLATE_20_80MM_OUTLINE_R_2, mode=Mode.SUBTRACT)
        with Locations((30.32, 10)):
            Circle(V_SLOT_GANTRY_PLATE_20_80MM_OUTLINE_R_2, mode=Mode.SUBTRACT)
        with Locations((14.825, 14.825)):
            Circle(V_SLOT_GANTRY_PLATE_20_80MM_OUTLINE_R_2, mode=Mode.SUBTRACT)
        with Locations((0, 20.32)):
            Circle(V_SLOT_GANTRY_PLATE_20_80MM_OUTLINE_R_2, mode=Mode.SUBTRACT)
        with Locations((9.69, 20.32)):
            Circle(V_SLOT_GANTRY_PLATE_20_80MM_OUTLINE_R_2, mode=Mode.SUBTRACT)
        with Locations((19.85, 20.32)):
            Circle(V_SLOT_GANTRY_PLATE_20_80MM_OUTLINE_R_2, mode=Mode.SUBTRACT)
        with Locations((29.85, 20.32)):
            Circle(V_SLOT_GANTRY_PLATE_20_80MM_OUTLINE_R_2, mode=Mode.SUBTRACT)
        with Locations((39.85, 0)):
            Circle(V_SLOT_GANTRY_PLATE_20_80MM_OUTLINE_R_2, mode=Mode.SUBTRACT)
        with Locations((49.85, 0)):
            Circle(V_SLOT_GANTRY_PLATE_20_80MM_OUTLINE_R_2, mode=Mode.SUBTRACT)
        with Locations((39.85, 20.32)):
            Circle(V_SLOT_GANTRY_PLATE_20_80MM_OUTLINE_R_2, mode=Mode.SUBTRACT)
        with Locations((49.85, 20.32)):
            Circle(V_SLOT_GANTRY_PLATE_20_80MM_OUTLINE_R_2, mode=Mode.SUBTRACT)
        with BuildLine():
            Line((-10, 32.82), (10, 32.82))
            ThreePointArc((10, 32.82), (12.5, 30.32), (10, 27.82))
            Line((10, 27.82), (-10, 27.82))
            ThreePointArc((-10, 27.82), (-12.5, 30.32), (-10, 32.82))
        make_face(mode=Mode.SUBTRACT)
        with Locations((19.85, 30.32)):
            Circle(V_SLOT_GANTRY_PLATE_20_80MM_OUTLINE_R_2, mode=Mode.SUBTRACT)
        with Locations((29.85, 30.32)):
            Circle(V_SLOT_GANTRY_PLATE_20_80MM_OUTLINE_R_2, mode=Mode.SUBTRACT)
        with BuildLine():
            Line((-3.25, 39.5), (3.25, 39.5))
            ThreePointArc((3.25, 39.5), (4.75, 38), (3.25, 36.5))
            Line((3.25, 36.5), (-3.25, 36.5))
            ThreePointArc((-3.25, 36.5), (-4.75, 38), (-3.25, 39.5))
        make_face(mode=Mode.SUBTRACT)
        with BuildLine():
            Line((23.25, 36.5), (16.75, 36.5))
            ThreePointArc((16.75, 36.5), (15.25, 38), (16.75, 39.5))
            Line((16.75, 39.5), (23.25, 39.5))
            ThreePointArc((23.25, 39.5), (24.75, 38), (23.25, 36.5))
        make_face(mode=Mode.SUBTRACT)
        with Locations((39.85, 30.32)):
            Circle(V_SLOT_GANTRY_PLATE_20_80MM_OUTLINE_R_2, mode=Mode.SUBTRACT)
        with Locations((49.85, 30.32)):
            Circle(V_SLOT_GANTRY_PLATE_20_80MM_OUTLINE_R_2, mode=Mode.SUBTRACT)
    extrude(amount=V_SLOT_GANTRY_PLATE_20_80MM_DEPTH)


with BuildPart() as body_2:
    # Sketch1 → Boss-Extrude1 (new body)
    # profile 1 of 5: a face of its own
    with BuildSketch(Plane(origin=(0, 0, 0), x_dir=(1, 0, 0), z_dir=(0, 1, 0))):
        Rectangle(SKETCH1_W, SKETCH1_H)
        with Locations((21.1, 21.75)):
            Circle(SKETCH1_R, mode=Mode.SUBTRACT)
        with Locations((21.1, -21.75)):
            Circle(SKETCH1_R, mode=Mode.SUBTRACT)
        with Locations((-21.1, -21.75)):
            Circle(SKETCH1_R, mode=Mode.SUBTRACT)
        with Locations((-21.1, 21.75)):
            Circle(SKETCH1_R, mode=Mode.SUBTRACT)
        with Locations(Location((0, -10, 0), (0, 0, 270))):
            Circle(SKETCH1_R_2, mode=Mode.SUBTRACT)
        with Locations(Location((10, 0, 0), (0, 0, 270))):
            Circle(SKETCH1_R_2, mode=Mode.SUBTRACT)
        with Locations(Location((0, 10, 0), (0, 0, 270))):
            Circle(SKETCH1_R_2, mode=Mode.SUBTRACT)
        with Locations(Location((-10, 0, 0), (0, 0, 270))):
            Circle(SKETCH1_R_2, mode=Mode.SUBTRACT)
    # profile 2 of 5: a face of its own
    with BuildSketch(Plane(origin=(0, 0, 0), x_dir=(1, 0, 0), z_dir=(0, 1, 0))):
        with Locations((-21.1, -21.75)):
            Circle(SKETCH1_R)
        with Locations(Location((-21.1, -21.75, 0), (0, 0, 270))):
            Circle(SKETCH1_R_2, mode=Mode.SUBTRACT)
    # profile 3 of 5: a face of its own
    with BuildSketch(Plane(origin=(0, 0, 0), x_dir=(1, 0, 0), z_dir=(0, 1, 0))):
        with Locations((-21.1, 21.75)):
            Circle(SKETCH1_R)
        with Locations(Location((-21.1, 21.75, 0), (0, 0, 270))):
            Circle(SKETCH1_R_2, mode=Mode.SUBTRACT)
    # profile 4 of 5: a face of its own
    with BuildSketch(Plane(origin=(0, 0, 0), x_dir=(1, 0, 0), z_dir=(0, 1, 0))):
        with Locations((21.1, 21.75)):
            Circle(SKETCH1_R)
        with Locations(Location((21.1, 21.75, 0), (0, 0, 270))):
            Circle(SKETCH1_R_2, mode=Mode.SUBTRACT)
    # profile 5 of 5: a face of its own
    with BuildSketch(Plane(origin=(0, 0, 0), x_dir=(1, 0, 0), z_dir=(0, 1, 0))):
        with Locations((21.1, -21.75)):
            Circle(SKETCH1_R)
        with Locations(Location((21.1, -21.75, 0), (0, 0, 270))):
            Circle(SKETCH1_R_2, mode=Mode.SUBTRACT)
    extrude(amount=BOSS_EXTRUDE1_DEPTH)

    # Sketch1<3> → Cut-Extrude1 (cut)
    with BuildSketch(Plane(origin=(0, 0, 0), x_dir=(1, 0, 0), z_dir=(0, 1, 0))):
        with Locations(Location((-21.1, 21.75, 0), (0, 0, 270))):
            Circle(SKETCH1_3_R)
        with Locations(Location((-21.1, -21.75, 0), (0, 0, 270))):
            Circle(SKETCH1_3_R)
        with Locations(Location((21.1, -21.75, 0), (0, 0, 270))):
            Circle(SKETCH1_3_R)
        with Locations(Location((21.1, 21.75, 0), (0, 0, 270))):
            Circle(SKETCH1_3_R)
    extrude(amount=CUT_EXTRUDE1_DEPTH, mode=Mode.SUBTRACT)


solid = Compound([part.part, body_2.part])
